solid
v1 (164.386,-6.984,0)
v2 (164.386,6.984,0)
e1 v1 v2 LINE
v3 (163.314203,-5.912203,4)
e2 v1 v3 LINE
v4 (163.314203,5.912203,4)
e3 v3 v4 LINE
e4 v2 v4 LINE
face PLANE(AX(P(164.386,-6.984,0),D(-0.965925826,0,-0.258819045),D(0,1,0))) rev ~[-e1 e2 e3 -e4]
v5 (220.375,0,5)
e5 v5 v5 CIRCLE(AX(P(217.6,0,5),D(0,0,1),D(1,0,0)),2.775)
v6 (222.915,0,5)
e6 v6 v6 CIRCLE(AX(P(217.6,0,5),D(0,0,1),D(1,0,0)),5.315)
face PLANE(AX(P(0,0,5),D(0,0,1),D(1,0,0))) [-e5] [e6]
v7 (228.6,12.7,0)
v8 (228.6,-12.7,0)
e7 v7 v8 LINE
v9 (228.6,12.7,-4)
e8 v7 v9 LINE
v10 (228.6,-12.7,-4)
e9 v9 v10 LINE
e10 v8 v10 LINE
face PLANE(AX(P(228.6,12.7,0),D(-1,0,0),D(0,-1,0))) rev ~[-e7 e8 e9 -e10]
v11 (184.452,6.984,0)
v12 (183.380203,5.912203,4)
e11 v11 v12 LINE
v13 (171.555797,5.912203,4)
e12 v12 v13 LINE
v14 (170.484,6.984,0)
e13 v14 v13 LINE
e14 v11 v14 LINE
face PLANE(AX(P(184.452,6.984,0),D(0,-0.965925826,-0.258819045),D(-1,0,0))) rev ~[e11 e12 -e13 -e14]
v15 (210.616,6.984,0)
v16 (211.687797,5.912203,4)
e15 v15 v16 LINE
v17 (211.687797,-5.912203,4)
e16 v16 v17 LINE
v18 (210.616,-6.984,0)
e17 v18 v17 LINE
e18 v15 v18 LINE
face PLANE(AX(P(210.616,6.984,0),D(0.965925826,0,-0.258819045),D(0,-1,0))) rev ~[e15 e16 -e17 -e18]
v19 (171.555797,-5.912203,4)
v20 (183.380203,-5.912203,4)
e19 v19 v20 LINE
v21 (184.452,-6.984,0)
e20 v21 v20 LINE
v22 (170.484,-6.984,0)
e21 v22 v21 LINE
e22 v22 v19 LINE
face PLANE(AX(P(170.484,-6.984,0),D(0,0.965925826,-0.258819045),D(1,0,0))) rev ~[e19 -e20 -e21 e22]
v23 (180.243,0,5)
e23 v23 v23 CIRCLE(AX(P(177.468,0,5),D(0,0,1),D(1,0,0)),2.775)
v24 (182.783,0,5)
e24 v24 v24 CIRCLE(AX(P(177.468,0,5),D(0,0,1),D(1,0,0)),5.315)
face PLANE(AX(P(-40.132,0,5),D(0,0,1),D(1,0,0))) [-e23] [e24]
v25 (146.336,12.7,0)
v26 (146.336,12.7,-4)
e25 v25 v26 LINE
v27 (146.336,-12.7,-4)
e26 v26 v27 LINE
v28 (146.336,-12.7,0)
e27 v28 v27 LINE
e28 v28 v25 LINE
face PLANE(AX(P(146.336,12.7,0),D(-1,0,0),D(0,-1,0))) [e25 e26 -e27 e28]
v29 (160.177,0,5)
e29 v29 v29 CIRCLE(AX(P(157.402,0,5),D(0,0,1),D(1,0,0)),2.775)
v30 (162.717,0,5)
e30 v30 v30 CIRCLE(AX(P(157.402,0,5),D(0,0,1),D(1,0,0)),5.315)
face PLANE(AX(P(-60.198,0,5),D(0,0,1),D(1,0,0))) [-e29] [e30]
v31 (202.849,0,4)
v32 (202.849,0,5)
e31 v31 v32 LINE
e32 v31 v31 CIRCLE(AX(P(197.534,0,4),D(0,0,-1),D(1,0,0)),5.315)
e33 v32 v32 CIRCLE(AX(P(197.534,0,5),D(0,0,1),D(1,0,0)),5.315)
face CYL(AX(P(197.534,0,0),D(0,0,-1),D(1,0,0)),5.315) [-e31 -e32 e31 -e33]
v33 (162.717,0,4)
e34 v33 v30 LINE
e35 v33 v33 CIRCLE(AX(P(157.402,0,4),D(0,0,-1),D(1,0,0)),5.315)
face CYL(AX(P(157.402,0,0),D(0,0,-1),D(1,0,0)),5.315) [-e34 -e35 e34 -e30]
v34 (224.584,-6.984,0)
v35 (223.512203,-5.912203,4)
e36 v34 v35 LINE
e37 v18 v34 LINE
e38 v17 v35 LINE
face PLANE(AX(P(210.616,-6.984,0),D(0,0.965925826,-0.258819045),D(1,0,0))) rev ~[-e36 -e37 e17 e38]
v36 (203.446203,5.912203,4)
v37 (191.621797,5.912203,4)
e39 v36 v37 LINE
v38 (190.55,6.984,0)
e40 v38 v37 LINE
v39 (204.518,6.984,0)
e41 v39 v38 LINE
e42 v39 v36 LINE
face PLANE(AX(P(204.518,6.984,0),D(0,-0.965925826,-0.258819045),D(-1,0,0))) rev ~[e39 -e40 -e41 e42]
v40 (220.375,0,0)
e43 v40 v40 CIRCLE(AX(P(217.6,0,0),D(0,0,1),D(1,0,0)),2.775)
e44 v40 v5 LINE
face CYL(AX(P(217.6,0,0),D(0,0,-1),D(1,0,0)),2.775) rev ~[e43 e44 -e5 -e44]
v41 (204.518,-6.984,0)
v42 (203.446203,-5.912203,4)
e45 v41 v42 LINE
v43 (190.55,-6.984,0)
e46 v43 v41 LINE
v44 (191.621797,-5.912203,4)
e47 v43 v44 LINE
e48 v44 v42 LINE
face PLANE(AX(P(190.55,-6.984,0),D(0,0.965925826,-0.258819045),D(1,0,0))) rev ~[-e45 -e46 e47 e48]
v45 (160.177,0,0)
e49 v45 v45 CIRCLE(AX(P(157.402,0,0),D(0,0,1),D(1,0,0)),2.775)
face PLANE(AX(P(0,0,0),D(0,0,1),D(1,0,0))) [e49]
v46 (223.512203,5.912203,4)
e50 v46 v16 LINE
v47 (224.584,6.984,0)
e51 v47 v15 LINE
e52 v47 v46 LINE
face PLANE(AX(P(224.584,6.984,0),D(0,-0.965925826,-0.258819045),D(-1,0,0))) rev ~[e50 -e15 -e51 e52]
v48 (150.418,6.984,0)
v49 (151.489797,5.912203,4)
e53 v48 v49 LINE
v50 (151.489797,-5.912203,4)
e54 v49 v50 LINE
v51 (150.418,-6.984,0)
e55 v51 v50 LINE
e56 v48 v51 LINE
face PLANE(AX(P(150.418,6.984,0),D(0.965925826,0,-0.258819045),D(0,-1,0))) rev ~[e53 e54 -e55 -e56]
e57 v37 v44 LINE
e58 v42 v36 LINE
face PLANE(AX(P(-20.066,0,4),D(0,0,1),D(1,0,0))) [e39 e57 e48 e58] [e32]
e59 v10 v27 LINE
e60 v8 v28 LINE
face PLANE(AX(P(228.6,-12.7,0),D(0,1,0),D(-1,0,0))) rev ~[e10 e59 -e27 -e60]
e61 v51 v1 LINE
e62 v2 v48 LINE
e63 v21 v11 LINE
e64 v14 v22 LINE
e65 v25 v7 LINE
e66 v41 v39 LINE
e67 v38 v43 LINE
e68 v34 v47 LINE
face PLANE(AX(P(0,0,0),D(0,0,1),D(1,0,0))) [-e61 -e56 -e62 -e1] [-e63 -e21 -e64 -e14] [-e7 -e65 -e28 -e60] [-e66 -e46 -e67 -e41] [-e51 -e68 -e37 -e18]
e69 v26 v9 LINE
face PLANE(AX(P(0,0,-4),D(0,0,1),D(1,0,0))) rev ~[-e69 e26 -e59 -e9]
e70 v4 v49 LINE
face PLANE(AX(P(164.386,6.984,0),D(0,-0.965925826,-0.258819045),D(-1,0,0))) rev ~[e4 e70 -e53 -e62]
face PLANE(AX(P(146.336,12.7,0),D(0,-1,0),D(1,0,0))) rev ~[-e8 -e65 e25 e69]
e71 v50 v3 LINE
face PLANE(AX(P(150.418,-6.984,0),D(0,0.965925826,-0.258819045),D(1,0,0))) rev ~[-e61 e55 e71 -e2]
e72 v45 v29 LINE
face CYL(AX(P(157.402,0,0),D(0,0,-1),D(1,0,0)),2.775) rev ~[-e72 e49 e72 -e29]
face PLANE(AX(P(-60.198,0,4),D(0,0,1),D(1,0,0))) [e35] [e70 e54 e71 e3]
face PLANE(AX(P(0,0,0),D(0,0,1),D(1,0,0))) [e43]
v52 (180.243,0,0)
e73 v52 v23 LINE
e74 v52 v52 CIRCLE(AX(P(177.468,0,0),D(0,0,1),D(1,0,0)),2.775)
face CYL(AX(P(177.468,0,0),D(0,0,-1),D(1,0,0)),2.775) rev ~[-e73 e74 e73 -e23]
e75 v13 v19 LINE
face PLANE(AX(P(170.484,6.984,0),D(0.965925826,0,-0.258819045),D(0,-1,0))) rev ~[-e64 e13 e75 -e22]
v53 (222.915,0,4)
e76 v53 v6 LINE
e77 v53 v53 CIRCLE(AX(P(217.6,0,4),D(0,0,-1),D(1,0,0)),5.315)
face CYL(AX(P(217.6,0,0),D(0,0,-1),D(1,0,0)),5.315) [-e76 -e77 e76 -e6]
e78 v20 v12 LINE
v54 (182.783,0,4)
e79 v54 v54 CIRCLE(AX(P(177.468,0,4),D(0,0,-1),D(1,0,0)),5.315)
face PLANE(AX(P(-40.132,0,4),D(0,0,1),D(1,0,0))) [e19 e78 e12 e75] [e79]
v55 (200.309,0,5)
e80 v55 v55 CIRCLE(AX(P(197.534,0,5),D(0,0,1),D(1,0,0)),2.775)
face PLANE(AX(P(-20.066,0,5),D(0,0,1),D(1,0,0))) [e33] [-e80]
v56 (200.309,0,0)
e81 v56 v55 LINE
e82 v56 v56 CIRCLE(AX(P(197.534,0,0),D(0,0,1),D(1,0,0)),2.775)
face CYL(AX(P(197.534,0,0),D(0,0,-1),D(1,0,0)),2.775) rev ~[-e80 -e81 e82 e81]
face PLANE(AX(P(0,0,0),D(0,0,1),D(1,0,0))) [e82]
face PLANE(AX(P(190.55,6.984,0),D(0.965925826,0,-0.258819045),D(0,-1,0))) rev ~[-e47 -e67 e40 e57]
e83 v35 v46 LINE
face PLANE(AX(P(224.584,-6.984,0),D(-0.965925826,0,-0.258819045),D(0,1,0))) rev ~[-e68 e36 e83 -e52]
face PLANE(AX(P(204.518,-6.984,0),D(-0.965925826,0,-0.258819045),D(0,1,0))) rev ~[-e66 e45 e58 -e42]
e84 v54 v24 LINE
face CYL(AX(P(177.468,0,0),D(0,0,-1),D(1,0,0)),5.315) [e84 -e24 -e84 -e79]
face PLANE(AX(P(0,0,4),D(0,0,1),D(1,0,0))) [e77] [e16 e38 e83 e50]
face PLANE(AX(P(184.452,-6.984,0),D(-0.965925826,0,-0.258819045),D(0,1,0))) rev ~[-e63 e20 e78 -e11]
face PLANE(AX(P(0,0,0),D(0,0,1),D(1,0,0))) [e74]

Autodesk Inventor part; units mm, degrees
ref_plane "YZ Plane" through (0, 0, 0) normal (1, 0, 0) x (0, 1, 0)
ref_plane "XZ Plane" through (0, 0, 0) normal (0, 1, 0) x (-1, 0, 0)
ref_plane "XY Plane" through (0, 0, 0) normal (0, 0, 1) x (1, 0, 0)
ref_plane "Work Plane1" through (0, 0, 0) normal (0, 0, 1) x (1, 0, 0)
ref_plane "Work Plane2" through (0, 0, 0) normal (0, 0, 1) x (1, 0, 0)
ref_plane "Work Plane3" through (0, 0, 0) normal (0, 0, 1) x (1, 0, 0)
sketch "Sketch1" plane through (0, 0, 0) normal (0, 0, 1) x (1, 0, 0)
  line L0 (232.95, -21.7) -> (142.052, -21.7)
  line L1 (142.052, -21.7) -> (142.052, 21.7)
  line L2 (142.052, 21.7) -> (232.95, 21.7)
  line L3 (232.95, 21.7) -> (232.95, -21.7)
  line L4 (148.402, -7.551111) -> (148.402, 7.551111)
  line L5 (226.6, 7.551111) -> (226.6, -7.551111)
  line L6 (205.085111, -9) -> (189.982889, -9)
  line L7 (188.534, 9) -> (206.534, 9)
  circle A0 centre (217.6, 0) radius 2.775
  circle A1 centre (217.6, 0) radius 5.315
  circle A2 centre (197.534, 0) radius 5.315
  circle A3 centre (177.468, 0) radius 5.315
  circle A4 centre (157.402, 0) radius 5.315
  circle A5 centre (217.6, 0) radius 2.775
  circle A6 centre (197.534, 0) radius 2.775
  circle A7 centre (177.468, 0) radius 2.775
  circle A8 centre (157.402, 0) radius 2.775
  line L8 (208.075, 9.906) -> (227.125, 9.906)
  line L9 (227.125, 9.906) -> (227.125, -9.906)
  line L10 (227.125, -9.906) -> (208.075, -9.906)
  line L11 (208.075, -9.906) -> (208.075, 9.906)
  line L12 (208.075, 9.906) -> (227.125, -9.906) construction
  line L13 (227.125, 9.906) -> (208.075, -9.906) construction
  line L14 (207.059, -9.906) -> (188.009, -9.906)
  line L15 (207.059, 9.906) -> (207.059, -9.906)
  line L16 (188.009, 9.906) -> (207.059, 9.906)
  line L17 (188.009, -9.906) -> (188.009, 9.906)
  line L18 (186.993, -9.906) -> (167.943, -9.906)
  line L19 (186.993, 9.906) -> (186.993, -9.906)
  line L20 (167.943, 9.906) -> (186.993, 9.906)
  line L21 (167.943, -9.906) -> (167.943, 9.906)
  line L22 (166.927, -9.906) -> (147.877, -9.906)
  line L23 (166.927, 9.906) -> (166.927, -9.906)
  line L24 (147.877, 9.906) -> (166.927, 9.906)
  line L25 (147.877, -9.906) -> (147.877, 9.906)
  point P0 (0, 0)
  dimension "d0" = 6.35
  dimension "d1" = 6.35
  dimension "d3" = 12.7
  dimension "d4" = 12.7
  dimension "d5" = 2.54
  dimension "d8" = 20.066
  dimension "d15" = 20.066
  dimension "d20" = 19.05
  dimension "d21" = 19.812
  dimension "d24" = 20.066
extrude "Extrusion1" add sketch "Sketch1" along normal blind 5 contours A1
sketch "Sketch3" plane through (0, 0, 0) normal (0, 0, 1) x (1, 0, 0)
  line L0 (225.6, -8) -> (209.6, -8) projected
  line L1 (225.6, 8) -> (225.6, -8) projected
  line L2 (209.6, 8) -> (225.6, 8) projected
  line L3 (209.6, -8) -> (209.6, 8) projected
  line L4 (210.616, -6.984) -> (224.584, -6.984)
  line L5 (224.584, -6.984) -> (224.584, 6.984)
  line L6 (224.584, 6.984) -> (210.616, 6.984)
  line L7 (210.616, 6.984) -> (210.616, -6.984)
  circle A0 centre (217.6, 0) radius 5.315 projected
  circle A1 centre (217.6, 0) radius 2.775 projected
  point P0 (0, 0)
  dimension "d40" = 1.016
sketch "Sketch3 outline for Extrusion3" plane through (0, 0, 0) normal (0, 0, 1) x (1, 0, 0)
  line L0 (210.616, -6.984) -> (224.584, -6.984)
  line L1 (210.616, 6.984) -> (210.616, -6.984)
  line L2 (224.584, -6.984) -> (224.584, 6.984)
  line L3 (224.584, 6.984) -> (210.616, 6.984)
  circle A0 centre (217.6, 0) radius 2.775
extrude "Extrusion3" add sketch "Sketch3 outline for Extrusion3" along normal blind 4 draft -15
pattern_linear "Rectangular Pattern1" count 4 spacing 20.066 along (-1, 0, 0) of "Extrusion3", "Extrusion1"
ref_plane "Work Plane4" through (0, 0, 0) normal (0, 0, 1) x (1, 0, 0)
sketch "Sketch4" plane through (0, 0, 0) normal (0, 0, 1) x (1, 0, 0)
  line L0 (-228.6, 12.7) -> (228.6, 12.7) projected
  line L1 (228.6, -12.7) -> (-228.6, -12.7) projected
  line L2 (228.6, 12.7) -> (228.6, -12.7) projected
  line L3 (146.336, 9) -> (146.336, -9) projected
  line L4 (228.6, 12.7) -> (146.336, 12.7)
  line L5 (146.336, 12.7) -> (146.336, -12.7)
  line L6 (146.336, -12.7) -> (228.6, -12.7)
  line L7 (228.6, -12.7) -> (228.6, 12.7)
  point P0 (0, 0)
extrude "Extrusion4" add sketch "Sketch4" against normal blind 4
properties part number "Bottom Holder"
